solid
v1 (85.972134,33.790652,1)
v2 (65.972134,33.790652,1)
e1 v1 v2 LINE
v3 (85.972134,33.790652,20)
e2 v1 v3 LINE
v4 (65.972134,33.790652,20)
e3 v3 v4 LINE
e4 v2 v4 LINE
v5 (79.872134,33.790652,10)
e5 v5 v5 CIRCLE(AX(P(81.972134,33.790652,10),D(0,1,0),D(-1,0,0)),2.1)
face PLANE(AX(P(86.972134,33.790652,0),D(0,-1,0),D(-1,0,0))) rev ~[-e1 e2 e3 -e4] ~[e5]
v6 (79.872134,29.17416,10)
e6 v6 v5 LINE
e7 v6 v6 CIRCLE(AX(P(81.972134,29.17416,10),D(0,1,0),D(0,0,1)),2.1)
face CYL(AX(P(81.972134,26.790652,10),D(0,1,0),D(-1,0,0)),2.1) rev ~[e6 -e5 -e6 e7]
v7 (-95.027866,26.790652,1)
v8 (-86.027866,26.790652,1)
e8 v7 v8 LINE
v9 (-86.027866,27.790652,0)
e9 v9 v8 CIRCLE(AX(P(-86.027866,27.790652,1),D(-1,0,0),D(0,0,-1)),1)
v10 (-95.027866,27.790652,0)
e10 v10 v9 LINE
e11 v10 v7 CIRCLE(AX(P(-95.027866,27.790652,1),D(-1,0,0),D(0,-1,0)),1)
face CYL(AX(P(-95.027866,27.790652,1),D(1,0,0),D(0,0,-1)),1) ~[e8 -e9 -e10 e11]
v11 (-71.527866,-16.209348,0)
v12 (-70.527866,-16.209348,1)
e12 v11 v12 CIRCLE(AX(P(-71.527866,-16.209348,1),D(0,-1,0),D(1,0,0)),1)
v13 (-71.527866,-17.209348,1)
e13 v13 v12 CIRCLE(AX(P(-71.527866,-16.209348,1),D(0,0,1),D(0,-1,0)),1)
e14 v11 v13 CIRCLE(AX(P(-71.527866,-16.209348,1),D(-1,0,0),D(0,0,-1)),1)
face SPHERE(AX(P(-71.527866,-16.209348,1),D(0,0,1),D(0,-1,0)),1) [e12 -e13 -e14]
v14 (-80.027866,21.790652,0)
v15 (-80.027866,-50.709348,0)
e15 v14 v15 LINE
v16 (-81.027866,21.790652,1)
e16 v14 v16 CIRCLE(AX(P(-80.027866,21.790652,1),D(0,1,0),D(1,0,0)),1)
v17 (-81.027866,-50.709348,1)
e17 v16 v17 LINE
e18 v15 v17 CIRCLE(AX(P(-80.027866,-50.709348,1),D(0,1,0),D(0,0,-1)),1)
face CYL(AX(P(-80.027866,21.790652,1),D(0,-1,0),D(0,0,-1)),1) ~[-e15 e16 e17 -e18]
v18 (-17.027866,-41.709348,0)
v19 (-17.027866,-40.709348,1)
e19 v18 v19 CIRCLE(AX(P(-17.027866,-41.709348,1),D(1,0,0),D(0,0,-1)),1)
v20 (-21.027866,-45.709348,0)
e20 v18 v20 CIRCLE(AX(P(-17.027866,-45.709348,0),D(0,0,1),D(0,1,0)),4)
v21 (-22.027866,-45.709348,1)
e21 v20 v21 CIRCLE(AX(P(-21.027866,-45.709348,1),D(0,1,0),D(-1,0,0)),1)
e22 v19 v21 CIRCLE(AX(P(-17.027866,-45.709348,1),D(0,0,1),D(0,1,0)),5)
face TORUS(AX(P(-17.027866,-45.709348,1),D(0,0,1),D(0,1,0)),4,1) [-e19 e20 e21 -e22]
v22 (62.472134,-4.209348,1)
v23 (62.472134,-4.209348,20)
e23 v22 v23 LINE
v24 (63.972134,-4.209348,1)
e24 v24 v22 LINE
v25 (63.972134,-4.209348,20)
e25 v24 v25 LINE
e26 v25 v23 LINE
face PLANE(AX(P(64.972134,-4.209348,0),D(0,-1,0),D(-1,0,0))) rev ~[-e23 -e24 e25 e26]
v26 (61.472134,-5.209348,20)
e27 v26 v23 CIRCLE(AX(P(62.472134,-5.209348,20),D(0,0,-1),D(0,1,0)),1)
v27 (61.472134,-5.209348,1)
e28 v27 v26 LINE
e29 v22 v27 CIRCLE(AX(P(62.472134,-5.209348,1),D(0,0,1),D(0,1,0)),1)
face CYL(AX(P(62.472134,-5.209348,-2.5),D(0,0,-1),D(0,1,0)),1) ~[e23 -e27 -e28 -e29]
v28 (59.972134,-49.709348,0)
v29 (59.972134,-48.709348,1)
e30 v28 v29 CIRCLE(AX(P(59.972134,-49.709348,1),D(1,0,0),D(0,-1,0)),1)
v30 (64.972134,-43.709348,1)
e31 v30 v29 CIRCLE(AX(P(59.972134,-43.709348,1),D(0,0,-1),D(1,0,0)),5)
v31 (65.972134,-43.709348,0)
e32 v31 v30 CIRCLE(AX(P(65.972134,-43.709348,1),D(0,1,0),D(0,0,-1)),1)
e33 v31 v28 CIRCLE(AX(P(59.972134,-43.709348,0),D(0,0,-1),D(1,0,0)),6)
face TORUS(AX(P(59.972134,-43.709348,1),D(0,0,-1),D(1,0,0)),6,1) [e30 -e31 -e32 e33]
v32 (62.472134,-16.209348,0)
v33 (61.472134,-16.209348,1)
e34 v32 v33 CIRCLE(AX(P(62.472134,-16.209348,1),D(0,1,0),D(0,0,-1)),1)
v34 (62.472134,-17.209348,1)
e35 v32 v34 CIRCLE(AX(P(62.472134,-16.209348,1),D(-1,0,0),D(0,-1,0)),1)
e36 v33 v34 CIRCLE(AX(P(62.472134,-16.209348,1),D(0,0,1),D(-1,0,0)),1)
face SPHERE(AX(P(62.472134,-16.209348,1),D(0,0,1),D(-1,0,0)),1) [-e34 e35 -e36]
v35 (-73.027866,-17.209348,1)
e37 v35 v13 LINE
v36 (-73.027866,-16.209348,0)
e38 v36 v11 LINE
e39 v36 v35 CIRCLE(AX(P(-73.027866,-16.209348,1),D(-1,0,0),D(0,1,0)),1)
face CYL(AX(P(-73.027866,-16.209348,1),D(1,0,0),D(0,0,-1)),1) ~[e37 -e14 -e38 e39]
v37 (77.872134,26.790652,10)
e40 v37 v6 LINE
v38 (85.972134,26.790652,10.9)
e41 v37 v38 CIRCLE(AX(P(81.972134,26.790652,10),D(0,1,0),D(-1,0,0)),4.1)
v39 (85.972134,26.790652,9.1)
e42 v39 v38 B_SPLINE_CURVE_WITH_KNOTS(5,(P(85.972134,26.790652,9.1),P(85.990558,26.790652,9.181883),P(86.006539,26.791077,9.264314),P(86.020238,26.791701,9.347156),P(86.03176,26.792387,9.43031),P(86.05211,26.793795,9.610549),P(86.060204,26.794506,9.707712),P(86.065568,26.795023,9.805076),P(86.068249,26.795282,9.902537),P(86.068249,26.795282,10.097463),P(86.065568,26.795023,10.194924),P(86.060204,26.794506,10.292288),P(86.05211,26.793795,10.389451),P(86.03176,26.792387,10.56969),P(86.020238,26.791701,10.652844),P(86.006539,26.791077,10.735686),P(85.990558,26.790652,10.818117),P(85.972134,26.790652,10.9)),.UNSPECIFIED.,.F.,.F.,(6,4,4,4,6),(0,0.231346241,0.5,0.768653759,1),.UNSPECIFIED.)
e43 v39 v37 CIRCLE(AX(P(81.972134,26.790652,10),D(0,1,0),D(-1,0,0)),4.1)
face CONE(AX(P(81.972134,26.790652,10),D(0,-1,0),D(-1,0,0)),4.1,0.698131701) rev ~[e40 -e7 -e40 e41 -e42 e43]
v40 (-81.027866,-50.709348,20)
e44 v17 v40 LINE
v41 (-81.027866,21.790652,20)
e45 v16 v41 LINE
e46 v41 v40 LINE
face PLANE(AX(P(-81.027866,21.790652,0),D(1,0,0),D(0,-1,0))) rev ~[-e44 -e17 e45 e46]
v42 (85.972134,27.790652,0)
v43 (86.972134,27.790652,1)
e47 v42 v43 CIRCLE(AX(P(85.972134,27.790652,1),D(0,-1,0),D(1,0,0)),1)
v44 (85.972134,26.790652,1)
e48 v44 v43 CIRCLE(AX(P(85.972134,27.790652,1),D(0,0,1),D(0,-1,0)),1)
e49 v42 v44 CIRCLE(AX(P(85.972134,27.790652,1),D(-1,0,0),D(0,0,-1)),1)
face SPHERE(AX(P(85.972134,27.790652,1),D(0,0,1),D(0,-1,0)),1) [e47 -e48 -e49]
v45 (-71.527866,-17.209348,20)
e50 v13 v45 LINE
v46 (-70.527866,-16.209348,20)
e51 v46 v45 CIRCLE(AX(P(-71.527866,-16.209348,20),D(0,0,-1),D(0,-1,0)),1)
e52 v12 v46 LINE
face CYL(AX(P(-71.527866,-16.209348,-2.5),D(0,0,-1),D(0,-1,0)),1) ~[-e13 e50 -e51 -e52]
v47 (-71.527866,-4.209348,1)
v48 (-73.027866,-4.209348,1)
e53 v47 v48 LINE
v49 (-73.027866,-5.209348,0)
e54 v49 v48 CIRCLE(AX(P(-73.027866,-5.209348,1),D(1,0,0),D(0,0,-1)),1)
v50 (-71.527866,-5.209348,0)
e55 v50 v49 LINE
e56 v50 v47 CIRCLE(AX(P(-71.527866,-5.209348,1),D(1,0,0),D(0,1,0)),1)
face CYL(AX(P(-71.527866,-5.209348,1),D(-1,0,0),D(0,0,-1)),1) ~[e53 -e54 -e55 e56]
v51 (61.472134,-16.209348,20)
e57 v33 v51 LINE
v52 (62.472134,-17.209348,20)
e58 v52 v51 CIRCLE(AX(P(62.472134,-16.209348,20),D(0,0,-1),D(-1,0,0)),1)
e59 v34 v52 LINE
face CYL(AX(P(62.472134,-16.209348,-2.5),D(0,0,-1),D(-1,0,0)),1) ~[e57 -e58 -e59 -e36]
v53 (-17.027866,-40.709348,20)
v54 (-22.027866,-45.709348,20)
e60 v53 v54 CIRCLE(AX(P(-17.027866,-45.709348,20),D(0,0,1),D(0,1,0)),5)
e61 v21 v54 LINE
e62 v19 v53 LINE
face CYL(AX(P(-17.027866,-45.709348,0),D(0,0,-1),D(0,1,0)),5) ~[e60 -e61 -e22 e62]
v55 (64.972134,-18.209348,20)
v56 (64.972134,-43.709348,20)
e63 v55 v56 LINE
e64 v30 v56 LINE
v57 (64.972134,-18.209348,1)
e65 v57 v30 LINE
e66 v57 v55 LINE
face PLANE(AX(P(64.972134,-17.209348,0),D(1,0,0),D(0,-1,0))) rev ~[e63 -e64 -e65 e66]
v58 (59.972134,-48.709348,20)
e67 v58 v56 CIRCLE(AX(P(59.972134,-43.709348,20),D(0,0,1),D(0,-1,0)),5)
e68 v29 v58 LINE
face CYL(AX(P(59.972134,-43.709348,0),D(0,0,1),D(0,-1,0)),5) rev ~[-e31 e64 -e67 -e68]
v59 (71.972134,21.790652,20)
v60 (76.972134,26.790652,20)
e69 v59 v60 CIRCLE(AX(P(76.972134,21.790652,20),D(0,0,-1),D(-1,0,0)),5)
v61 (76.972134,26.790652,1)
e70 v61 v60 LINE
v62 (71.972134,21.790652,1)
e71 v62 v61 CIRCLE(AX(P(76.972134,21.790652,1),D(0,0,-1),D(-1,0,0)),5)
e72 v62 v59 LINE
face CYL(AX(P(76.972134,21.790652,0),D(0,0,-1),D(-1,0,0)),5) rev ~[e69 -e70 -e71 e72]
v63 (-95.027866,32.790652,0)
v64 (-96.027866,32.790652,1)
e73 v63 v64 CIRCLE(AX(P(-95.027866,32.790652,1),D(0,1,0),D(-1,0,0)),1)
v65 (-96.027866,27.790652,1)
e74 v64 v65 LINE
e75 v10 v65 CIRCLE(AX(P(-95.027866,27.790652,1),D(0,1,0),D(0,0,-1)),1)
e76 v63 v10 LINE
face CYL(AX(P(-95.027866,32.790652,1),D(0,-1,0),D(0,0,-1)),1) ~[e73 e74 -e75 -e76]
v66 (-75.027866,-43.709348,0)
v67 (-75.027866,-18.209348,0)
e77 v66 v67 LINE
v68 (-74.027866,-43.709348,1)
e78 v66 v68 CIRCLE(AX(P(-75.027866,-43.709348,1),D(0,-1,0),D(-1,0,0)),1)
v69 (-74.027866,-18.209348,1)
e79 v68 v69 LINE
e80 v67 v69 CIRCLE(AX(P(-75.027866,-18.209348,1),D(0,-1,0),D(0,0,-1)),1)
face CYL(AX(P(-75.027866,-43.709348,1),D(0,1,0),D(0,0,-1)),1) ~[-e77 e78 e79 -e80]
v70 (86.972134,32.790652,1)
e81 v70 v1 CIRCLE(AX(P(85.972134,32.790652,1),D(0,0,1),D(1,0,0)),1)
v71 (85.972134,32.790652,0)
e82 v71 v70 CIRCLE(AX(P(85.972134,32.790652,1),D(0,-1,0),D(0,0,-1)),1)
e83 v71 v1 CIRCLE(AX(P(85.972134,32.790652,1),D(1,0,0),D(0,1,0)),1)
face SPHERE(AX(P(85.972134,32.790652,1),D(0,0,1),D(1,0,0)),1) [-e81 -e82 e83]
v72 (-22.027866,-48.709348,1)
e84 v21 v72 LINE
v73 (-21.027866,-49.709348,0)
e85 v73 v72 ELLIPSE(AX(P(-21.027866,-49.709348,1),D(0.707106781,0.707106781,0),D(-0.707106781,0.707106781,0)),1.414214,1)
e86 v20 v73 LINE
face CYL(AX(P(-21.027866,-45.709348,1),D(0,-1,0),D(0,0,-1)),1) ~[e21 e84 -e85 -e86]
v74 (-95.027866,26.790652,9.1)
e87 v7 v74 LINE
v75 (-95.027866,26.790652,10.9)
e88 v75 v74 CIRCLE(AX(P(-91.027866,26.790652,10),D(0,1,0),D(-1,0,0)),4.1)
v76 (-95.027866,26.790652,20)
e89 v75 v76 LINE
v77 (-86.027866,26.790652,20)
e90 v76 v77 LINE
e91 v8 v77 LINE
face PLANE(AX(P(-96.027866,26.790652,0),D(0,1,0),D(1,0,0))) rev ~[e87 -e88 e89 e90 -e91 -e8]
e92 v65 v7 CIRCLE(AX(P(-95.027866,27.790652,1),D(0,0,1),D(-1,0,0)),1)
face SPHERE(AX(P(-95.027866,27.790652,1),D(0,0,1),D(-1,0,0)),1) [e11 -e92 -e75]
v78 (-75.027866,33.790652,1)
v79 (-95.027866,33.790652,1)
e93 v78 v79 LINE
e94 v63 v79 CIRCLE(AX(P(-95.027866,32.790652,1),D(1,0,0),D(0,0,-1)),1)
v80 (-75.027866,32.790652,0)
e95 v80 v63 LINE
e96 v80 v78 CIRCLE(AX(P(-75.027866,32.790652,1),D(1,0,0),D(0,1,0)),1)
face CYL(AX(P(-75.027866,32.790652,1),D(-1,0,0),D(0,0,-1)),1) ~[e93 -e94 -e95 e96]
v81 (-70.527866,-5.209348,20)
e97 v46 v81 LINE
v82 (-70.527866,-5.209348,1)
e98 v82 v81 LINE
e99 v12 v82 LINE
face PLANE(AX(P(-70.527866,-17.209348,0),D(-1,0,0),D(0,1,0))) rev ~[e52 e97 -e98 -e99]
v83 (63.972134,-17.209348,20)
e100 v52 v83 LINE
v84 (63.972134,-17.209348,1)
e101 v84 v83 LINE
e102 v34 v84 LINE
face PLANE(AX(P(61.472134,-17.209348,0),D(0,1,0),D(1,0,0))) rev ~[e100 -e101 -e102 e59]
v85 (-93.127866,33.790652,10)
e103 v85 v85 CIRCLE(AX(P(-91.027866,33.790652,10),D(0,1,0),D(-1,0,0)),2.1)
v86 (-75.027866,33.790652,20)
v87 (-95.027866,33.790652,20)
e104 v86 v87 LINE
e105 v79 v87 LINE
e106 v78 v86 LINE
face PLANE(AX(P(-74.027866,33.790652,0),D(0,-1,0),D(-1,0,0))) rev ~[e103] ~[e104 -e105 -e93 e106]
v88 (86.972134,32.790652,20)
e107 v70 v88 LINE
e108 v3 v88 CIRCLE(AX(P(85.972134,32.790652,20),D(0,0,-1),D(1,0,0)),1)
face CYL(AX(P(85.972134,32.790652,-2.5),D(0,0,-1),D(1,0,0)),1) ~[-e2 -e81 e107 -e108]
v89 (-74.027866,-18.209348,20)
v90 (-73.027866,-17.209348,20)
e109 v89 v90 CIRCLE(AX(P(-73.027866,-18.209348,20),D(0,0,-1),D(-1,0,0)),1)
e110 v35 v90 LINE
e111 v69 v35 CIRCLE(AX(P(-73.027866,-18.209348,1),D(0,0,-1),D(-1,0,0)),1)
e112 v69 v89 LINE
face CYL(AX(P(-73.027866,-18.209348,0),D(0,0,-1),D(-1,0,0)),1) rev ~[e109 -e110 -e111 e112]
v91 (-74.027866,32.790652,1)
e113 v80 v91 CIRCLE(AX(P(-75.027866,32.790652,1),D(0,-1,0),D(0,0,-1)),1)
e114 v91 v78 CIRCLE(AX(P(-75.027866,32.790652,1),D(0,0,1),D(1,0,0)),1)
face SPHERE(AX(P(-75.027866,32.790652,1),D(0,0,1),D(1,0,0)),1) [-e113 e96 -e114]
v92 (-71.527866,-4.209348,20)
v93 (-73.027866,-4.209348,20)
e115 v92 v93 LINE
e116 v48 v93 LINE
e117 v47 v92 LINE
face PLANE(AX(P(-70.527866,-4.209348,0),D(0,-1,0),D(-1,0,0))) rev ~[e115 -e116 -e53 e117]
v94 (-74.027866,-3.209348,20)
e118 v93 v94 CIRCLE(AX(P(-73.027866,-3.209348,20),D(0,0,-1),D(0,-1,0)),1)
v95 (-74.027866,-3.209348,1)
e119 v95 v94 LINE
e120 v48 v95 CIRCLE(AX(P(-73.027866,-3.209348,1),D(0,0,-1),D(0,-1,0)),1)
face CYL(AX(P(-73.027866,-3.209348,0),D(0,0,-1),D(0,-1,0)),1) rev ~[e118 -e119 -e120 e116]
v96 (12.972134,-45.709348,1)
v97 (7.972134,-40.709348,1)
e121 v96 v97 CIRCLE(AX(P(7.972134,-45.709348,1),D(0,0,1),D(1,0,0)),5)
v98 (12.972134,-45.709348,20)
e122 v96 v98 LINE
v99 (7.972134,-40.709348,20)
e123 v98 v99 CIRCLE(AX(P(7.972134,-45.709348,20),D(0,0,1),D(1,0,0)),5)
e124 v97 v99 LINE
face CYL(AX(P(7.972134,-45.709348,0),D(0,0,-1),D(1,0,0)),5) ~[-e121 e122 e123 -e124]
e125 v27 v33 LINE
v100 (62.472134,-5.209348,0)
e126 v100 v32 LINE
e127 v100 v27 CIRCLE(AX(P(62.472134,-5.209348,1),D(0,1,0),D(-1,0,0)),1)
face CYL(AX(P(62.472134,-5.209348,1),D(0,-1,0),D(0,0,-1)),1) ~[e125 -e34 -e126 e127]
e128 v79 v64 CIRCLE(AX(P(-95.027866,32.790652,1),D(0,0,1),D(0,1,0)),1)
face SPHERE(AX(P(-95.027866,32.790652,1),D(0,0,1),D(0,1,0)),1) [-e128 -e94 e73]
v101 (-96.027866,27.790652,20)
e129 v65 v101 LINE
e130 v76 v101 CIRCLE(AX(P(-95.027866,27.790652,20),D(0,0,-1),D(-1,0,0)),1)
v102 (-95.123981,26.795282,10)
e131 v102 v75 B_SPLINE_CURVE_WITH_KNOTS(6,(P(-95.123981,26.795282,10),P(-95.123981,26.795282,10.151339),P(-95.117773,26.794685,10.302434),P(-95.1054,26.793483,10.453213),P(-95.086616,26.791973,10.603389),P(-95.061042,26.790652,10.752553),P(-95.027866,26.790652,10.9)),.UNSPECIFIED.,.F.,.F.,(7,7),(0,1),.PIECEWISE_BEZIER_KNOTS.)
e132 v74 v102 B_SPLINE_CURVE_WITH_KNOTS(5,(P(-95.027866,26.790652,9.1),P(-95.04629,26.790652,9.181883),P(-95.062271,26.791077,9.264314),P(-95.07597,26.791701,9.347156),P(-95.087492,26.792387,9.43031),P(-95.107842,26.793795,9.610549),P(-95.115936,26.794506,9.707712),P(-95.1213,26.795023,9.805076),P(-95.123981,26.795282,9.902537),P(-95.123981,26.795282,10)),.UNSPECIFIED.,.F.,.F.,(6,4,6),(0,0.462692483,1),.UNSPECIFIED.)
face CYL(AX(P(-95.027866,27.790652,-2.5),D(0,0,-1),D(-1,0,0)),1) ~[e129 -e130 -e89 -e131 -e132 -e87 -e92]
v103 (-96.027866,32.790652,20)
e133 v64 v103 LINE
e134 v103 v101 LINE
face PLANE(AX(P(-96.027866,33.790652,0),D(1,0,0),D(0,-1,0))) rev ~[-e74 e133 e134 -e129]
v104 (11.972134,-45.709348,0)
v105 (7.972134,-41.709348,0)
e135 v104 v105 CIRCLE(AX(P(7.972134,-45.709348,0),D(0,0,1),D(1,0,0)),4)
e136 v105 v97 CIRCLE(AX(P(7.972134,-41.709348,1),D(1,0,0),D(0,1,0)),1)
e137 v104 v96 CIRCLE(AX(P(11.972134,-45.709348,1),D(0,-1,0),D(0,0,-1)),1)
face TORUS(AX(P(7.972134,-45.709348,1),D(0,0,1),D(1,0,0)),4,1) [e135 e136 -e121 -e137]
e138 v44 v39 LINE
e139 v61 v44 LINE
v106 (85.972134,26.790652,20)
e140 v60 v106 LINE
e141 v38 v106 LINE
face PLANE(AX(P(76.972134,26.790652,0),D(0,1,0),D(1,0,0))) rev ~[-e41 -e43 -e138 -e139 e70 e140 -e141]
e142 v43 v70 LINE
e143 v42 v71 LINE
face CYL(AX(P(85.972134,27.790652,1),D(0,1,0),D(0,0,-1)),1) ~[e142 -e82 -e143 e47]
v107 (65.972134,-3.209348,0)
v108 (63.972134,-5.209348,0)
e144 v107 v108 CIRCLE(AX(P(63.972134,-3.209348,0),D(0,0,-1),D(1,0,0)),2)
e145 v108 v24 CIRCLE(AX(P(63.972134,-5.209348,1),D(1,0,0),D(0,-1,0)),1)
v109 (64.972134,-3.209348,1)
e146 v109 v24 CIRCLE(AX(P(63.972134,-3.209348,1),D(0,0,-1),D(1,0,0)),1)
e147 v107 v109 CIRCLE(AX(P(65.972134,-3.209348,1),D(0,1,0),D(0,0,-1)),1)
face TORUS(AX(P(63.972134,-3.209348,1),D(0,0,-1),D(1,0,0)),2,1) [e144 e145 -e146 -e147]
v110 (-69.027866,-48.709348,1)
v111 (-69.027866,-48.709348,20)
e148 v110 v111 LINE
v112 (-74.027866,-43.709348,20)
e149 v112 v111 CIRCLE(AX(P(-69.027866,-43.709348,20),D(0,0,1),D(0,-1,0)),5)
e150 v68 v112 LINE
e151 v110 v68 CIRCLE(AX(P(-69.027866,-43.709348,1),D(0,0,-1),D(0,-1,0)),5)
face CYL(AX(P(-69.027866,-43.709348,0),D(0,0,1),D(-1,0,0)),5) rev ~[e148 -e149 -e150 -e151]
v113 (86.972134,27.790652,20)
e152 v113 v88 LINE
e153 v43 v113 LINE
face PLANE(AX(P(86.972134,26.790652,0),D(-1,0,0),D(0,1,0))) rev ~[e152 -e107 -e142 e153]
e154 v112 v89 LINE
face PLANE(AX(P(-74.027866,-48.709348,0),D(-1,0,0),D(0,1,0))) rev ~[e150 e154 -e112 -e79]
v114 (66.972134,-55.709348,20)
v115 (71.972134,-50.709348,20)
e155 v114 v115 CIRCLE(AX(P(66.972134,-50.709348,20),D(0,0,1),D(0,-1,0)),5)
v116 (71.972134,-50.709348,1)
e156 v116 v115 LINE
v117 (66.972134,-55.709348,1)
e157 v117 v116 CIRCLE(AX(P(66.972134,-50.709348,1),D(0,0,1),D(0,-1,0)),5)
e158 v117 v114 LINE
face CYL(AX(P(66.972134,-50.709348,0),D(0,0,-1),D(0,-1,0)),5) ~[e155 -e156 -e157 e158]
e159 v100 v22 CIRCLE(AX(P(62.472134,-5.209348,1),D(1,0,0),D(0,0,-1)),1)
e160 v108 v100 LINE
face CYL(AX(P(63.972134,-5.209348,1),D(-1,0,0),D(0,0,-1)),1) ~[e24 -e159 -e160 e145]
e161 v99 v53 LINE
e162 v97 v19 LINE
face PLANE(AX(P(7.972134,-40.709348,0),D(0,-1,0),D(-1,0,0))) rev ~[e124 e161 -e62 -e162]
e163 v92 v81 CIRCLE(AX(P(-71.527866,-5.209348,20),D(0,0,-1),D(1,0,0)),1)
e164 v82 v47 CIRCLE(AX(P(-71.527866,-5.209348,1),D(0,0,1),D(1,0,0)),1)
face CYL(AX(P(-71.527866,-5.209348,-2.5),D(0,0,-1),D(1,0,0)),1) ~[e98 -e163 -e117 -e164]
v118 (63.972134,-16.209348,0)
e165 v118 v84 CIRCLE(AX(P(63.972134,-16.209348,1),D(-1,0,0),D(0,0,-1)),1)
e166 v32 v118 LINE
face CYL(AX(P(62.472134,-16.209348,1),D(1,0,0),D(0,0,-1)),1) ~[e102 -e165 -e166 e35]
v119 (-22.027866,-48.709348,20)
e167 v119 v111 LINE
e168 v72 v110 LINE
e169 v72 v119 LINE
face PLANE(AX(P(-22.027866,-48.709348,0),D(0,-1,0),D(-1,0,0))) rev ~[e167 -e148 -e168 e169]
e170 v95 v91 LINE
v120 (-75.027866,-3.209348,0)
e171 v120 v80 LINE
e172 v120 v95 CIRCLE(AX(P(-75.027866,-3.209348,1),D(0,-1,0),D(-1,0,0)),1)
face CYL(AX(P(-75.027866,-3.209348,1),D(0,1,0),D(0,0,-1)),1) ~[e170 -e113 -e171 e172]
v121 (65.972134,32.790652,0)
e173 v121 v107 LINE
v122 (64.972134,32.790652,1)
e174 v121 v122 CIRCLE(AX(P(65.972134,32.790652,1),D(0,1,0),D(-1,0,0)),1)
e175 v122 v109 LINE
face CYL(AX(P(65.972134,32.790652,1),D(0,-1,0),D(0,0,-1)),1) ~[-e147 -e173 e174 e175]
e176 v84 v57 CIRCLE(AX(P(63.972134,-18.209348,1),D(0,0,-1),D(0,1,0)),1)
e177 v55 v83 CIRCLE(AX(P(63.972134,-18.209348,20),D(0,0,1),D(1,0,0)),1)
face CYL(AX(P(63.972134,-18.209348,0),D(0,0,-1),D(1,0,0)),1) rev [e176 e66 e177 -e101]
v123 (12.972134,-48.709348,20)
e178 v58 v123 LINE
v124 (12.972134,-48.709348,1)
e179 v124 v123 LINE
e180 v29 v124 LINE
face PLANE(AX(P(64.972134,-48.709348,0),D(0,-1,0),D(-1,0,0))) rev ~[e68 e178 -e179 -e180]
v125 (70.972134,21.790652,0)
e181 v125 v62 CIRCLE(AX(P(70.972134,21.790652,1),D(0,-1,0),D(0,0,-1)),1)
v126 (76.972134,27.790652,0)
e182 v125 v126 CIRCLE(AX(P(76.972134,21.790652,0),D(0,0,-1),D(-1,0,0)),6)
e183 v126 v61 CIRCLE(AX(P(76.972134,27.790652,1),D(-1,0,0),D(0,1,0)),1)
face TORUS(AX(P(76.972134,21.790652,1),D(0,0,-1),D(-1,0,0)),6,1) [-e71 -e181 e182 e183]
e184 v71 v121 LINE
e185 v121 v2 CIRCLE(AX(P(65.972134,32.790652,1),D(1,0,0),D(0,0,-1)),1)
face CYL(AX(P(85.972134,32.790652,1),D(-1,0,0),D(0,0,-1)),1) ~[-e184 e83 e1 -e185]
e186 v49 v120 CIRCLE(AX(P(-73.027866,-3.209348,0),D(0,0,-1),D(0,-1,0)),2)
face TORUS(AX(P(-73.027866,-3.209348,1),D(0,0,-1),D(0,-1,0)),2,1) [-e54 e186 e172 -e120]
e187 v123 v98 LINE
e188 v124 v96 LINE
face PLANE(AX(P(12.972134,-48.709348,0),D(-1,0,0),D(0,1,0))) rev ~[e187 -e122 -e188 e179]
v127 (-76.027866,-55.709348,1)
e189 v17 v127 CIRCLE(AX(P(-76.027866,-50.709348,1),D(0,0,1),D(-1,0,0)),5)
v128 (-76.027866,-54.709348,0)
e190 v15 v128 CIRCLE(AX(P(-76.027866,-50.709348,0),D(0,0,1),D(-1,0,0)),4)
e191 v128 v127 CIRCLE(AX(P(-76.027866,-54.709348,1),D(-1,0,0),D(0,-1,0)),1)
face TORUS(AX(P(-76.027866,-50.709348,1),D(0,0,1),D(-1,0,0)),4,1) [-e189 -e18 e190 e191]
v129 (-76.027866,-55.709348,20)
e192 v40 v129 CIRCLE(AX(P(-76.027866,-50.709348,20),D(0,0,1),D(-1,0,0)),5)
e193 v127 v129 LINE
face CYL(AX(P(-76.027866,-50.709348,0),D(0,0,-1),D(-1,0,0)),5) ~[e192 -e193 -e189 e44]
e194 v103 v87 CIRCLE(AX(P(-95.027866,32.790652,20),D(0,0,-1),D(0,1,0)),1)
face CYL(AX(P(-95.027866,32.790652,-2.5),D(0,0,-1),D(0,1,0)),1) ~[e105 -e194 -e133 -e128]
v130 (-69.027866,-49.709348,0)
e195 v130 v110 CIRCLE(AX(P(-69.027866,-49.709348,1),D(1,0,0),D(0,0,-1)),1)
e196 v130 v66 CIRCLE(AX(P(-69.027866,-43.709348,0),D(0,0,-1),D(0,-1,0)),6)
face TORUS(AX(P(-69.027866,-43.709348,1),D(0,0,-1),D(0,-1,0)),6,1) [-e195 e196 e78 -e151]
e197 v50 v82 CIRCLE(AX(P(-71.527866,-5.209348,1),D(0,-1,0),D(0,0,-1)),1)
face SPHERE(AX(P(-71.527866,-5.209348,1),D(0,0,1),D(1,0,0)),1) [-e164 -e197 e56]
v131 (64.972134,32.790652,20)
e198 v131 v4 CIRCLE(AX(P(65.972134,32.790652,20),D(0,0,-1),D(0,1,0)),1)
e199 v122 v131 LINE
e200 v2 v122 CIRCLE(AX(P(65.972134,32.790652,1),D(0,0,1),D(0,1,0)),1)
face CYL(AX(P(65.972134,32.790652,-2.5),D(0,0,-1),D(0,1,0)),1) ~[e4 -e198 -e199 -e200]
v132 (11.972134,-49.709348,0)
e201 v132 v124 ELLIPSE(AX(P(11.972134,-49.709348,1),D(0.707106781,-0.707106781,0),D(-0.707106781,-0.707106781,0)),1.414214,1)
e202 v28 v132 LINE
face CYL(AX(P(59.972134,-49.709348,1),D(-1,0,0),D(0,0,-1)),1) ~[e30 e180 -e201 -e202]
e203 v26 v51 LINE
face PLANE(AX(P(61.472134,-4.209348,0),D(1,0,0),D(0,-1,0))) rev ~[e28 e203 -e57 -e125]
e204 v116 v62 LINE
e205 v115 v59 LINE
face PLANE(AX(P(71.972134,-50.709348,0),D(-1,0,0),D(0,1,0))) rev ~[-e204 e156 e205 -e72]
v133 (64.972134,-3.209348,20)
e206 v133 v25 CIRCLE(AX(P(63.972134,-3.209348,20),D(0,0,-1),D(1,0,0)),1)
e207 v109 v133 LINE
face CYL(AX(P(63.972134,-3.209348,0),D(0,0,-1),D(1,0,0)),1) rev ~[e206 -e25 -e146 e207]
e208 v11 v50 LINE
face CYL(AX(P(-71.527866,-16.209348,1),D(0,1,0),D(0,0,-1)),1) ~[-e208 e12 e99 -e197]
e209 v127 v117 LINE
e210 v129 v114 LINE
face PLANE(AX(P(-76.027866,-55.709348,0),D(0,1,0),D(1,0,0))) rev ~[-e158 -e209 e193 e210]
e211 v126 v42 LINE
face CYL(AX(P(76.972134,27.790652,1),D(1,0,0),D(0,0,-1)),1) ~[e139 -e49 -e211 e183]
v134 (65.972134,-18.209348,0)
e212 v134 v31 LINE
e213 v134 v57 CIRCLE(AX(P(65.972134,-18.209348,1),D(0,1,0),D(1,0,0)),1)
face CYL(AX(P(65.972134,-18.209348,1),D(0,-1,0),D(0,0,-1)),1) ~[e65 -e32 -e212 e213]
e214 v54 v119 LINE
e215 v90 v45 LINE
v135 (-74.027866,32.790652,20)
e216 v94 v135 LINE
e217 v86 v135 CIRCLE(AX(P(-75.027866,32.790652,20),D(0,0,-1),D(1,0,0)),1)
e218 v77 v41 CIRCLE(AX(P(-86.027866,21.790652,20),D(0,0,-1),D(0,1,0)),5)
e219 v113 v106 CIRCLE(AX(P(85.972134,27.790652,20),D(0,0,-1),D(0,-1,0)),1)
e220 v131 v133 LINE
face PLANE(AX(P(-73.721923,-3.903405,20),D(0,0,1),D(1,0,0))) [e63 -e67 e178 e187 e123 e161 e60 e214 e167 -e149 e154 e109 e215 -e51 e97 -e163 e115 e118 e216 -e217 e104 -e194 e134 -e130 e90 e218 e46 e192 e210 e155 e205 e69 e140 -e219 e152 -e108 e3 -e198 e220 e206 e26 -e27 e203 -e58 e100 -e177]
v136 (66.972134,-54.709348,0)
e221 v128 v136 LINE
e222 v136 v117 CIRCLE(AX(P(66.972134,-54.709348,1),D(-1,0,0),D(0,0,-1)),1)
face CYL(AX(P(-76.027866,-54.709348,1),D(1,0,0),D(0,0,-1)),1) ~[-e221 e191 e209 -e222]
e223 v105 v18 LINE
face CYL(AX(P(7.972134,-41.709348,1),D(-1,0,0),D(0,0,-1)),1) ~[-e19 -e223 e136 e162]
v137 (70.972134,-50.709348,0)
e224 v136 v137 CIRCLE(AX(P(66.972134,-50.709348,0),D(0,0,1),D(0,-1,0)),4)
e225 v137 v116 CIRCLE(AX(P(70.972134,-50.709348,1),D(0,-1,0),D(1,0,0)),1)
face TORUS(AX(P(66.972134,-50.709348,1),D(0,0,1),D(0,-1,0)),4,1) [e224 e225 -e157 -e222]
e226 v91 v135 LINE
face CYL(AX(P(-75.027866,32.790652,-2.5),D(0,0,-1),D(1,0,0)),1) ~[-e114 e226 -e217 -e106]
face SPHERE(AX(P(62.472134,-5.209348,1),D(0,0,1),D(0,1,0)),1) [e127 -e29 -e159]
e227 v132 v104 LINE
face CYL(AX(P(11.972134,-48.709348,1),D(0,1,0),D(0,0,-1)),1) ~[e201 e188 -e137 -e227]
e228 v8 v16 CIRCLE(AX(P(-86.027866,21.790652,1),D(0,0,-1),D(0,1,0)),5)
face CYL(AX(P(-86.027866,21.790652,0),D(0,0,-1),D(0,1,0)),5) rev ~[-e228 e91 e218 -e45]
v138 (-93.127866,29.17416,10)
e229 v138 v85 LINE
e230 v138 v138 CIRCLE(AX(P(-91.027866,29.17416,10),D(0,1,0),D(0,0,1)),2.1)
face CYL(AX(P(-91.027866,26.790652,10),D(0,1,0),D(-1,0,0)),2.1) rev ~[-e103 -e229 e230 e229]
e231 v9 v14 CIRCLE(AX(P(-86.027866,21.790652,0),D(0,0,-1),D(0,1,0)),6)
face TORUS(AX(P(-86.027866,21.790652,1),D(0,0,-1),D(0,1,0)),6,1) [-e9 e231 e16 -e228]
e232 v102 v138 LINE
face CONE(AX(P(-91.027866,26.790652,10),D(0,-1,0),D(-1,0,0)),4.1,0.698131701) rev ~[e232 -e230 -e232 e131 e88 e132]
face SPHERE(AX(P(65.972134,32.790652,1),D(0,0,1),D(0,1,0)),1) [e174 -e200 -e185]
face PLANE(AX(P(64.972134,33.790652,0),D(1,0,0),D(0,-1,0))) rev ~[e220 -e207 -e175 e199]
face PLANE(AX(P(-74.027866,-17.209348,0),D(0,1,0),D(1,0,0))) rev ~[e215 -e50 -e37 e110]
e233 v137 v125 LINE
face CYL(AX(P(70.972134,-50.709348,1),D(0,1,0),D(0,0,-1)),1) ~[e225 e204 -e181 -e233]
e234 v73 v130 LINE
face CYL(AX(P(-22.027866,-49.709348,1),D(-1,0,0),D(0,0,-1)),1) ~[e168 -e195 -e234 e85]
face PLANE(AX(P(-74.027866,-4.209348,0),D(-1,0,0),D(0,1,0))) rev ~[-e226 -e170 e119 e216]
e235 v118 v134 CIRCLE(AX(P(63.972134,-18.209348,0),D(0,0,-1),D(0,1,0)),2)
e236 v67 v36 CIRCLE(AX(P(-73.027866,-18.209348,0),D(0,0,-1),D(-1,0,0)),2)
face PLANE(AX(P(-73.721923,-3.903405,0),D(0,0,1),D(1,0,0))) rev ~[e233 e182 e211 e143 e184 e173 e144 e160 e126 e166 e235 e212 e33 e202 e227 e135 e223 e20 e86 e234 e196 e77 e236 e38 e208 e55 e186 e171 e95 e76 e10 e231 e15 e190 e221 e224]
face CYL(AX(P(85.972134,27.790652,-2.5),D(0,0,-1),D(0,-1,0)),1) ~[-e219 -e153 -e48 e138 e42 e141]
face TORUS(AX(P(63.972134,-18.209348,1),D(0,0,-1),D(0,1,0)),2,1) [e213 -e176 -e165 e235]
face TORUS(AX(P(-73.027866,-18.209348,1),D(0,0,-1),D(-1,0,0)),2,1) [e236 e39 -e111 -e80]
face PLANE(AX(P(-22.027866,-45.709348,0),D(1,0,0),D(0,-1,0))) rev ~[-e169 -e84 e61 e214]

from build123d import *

# Parameters (mm, degrees)
F1_DEPTH             = 20
F4_D                 = 4.2
F4_CSINK_D           = 8.2
F4_CSINK_ANGLE       = 80
F4_ON_F2_D           = 4.2
F4_ON_F2_CSINK_D     = 8.2
F4_ON_F2_CSINK_ANGLE = 80
F5_T1_DEPTH          = 20
F5_T3_DEPTH          = 25
F6_R                 = 5
F7_R                 = 1


# Not quite as in the source:
# - a fillet or chamfer that OpenCascade refuses, or shapes differently, is made with other operations: its cross-section is extruded or revolved along the edge and cut away or added


with BuildPart() as f1:
    # F0 (on Top) → F1 (new body)
    with BuildSketch(Plane.XY):
        with BuildLine():
            Line((-74.0278660059, -17.2093475759), (-70.5278660059, -17.2093475759))
            Line((-70.5278660059, -17.2093475759), (-70.5278660059, -4.2093475759))
            Line((-70.5278660059, -4.2093475759), (-74.0278660059, -4.2093475759))
            Line((-74.0278660059, -4.2093475759), (-74.0278660059, 33.7906524241))
            Line((-74.0278660059, 33.7906524241), (-81.0278660059, 33.7906524241))
            Line((-81.0278660059, 33.7906524241), (-96.0278660059, 33.7906524241))
            Line((-96.0278660059, 33.7906524241), (-96.0278660059, 26.7906524241))
            Line((-96.0278660059, 26.7906524241), (-86.0278660059, 26.7906524241))
            ThreePointArc((-86.0278660059, 26.7906524241), (-82.4923321, 25.32618633), (-81.0278660059, 21.7906524241))
            Line((-81.0278660059, 21.7906524241), (-81.0278660059, -48.7093475759))
            Line((-81.0278660059, -48.7093475759), (-81.0278660059, -50.7093475759))
            ThreePointArc((-81.0278660059, -50.7093475759), (-79.5633999118, -54.2448814818), (-76.0278660059, -55.7093475759))
            Line((-76.0278660059, -55.7093475759), (-48.0278660059, -55.7093475759))
            Line((-48.0278660059, -55.7093475759), (-4.5278660059, -55.7093475759))
            Line((-4.5278660059, -55.7093475759), (38.9721339941, -55.7093475759))
            Line((38.9721339941, -55.7093475759), (66.9721339941, -55.7093475759))
            ThreePointArc((66.9721339941, -55.7093475759), (70.5076679, -54.2448814818), (71.9721339941, -50.7093475759))
            Line((71.9721339941, -50.7093475759), (71.9721339941, -48.7093475759))
            Line((71.9721339941, -48.7093475759), (71.9721339941, 21.7906524241))
            ThreePointArc((71.9721339941, 21.7906524241), (73.4366000882, 25.32618633), (76.9721339941, 26.7906524241))
            Line((76.9721339941, 26.7906524241), (86.9721339941, 26.7906524241))
            Line((86.9721339941, 26.7906524241), (86.9721339941, 33.7906524241))
            Line((86.9721339941, 33.7906524241), (71.9721339941, 33.7906524241))
            Line((71.9721339941, 33.7906524241), (64.9721339941, 33.7906524241))
            Line((64.9721339941, 33.7906524241), (64.9721339941, -4.2093475759))
            Line((64.9721339941, -4.2093475759), (61.4721339941, -4.2093475759))
            Line((61.4721339941, -4.2093475759), (61.4721339941, -17.2093475759))
            Line((61.4721339941, -17.2093475759), (64.9721339941, -17.2093475759))
            Line((64.9721339941, -17.2093475759), (64.9721339941, -48.7093475759))
            Line((64.9721339941, -48.7093475759), (12.9721339941, -48.7093475759))
            Line((12.9721339941, -48.7093475759), (12.9721339941, -45.7093475759))
            ThreePointArc((12.9721339941, -45.7093475759), (11.5076679, -42.17381367), (7.9721339941, -40.7093475759))
            Line((7.9721339941, -40.7093475759), (-4.5278660059, -40.7093475759))
            Line((-4.5278660059, -40.7093475759), (-17.0278660059, -40.7093475759))
            ThreePointArc((-17.0278660059, -40.7093475759), (-20.5633999118, -42.17381367), (-22.0278660059, -45.7093475759))
            Line((-22.0278660059, -45.7093475759), (-22.0278660059, -48.7093475759))
            Line((-22.0278660059, -48.7093475759), (-74.0278660059, -48.7093475759))
            Line((-74.0278660059, -48.7093475759), (-74.0278660059, -17.2093475759))
        make_face()
    extrude(amount=F1_DEPTH)

    # F4 (through all)
    with Locations(Plane.XZ.offset(-26.7906524241)):
        with Locations((81.9721339941, 10)):
            CounterSinkHole(F4_D / 2, F4_CSINK_D / 2, counter_sink_angle=F4_CSINK_ANGLE)

    # F4 on F2 (through all)
    with Locations(Plane.XZ.offset(-26.7906524241)):
        with Locations((-91.0278660059, 10)):
            CounterSinkHole(F4_ON_F2_D / 2, F4_ON_F2_CSINK_D / 2, counter_sink_angle=F4_ON_F2_CSINK_ANGLE)

    # F5: fillet of radius 1 on 14 edges, made by hand

    # F5_s2 → F5_t1 (join)
    with BuildSketch(Plane.XY):
        with BuildLine():
            ThreePointArc((-73.0278660059, -4.2093475759), (-73.7349727871, -3.9164543571), (-74.0278660059, -3.2093475759))
            Line((-74.0278660059, -3.2093475759), (-74.0278660059, -4.2093475759))
            Line((-74.0278660059, -4.2093475759), (-73.0278660059, -4.2093475759))
        make_face()
        with BuildLine():
            ThreePointArc((-74.0278660059, -18.2093475759), (-73.7349727871, -17.5022407947), (-73.0278660059, -17.2093475759))
            Line((-73.0278660059, -17.2093475759), (-74.0278660059, -17.2093475759))
            Line((-74.0278660059, -17.2093475759), (-74.0278660059, -18.2093475759))
        make_face()
        with BuildLine():
            ThreePointArc((64.9721339941, -18.2093475759), (64.6792407753, -17.5022407947), (63.9721339941, -17.2093475759))
            Line((63.9721339941, -17.2093475759), (64.9721339941, -17.2093475759))
            Line((64.9721339941, -17.2093475759), (64.9721339941, -18.2093475759))
        make_face()
        with BuildLine():
            ThreePointArc((64.9721339941, -3.2093475759), (64.6792407753, -3.9164543571), (63.9721339941, -4.2093475759))
            Line((63.9721339941, -4.2093475759), (64.9721339941, -4.2093475759))
            Line((64.9721339941, -4.2093475759), (64.9721339941, -3.2093475759))
        make_face()
    extrude(amount=F5_T1_DEPTH)

    # F5_s4 → F5_t3 (cut)
    with BuildSketch(Plane.XY.offset(-2.5)):
        with BuildLine():
            ThreePointArc((65.9721339941, 33.7906524241), (65.2650272129, 33.4977592053), (64.9721339941, 32.7906524241))
            Line((64.9721339941, 32.7906524241), (64.9721339941, 33.7906524241))
            Line((64.9721339941, 33.7906524241), (65.9721339941, 33.7906524241))
        make_face()
        with BuildLine():
            ThreePointArc((62.4721339941, -4.2093475759), (61.7650272129, -4.5022407947), (61.4721339941, -5.2093475759))
            Line((61.4721339941, -5.2093475759), (61.4721339941, -4.2093475759))
            Line((61.4721339941, -4.2093475759), (62.4721339941, -4.2093475759))
        make_face()
        with BuildLine():
            ThreePointArc((61.4721339941, -16.2093475759), (61.7650272129, -16.9164543571), (62.4721339941, -17.2093475759))
            Line((62.4721339941, -17.2093475759), (61.4721339941, -17.2093475759))
            Line((61.4721339941, -17.2093475759), (61.4721339941, -16.2093475759))
        make_face()
        with BuildLine():
            ThreePointArc((-71.5278660059, -17.2093475759), (-70.8207592247, -16.9164543571), (-70.5278660059, -16.2093475759))
            Line((-70.5278660059, -16.2093475759), (-70.5278660059, -17.2093475759))
            Line((-70.5278660059, -17.2093475759), (-71.5278660059, -17.2093475759))
        make_face()
        with BuildLine():
            ThreePointArc((-74.0278660059, 32.7906524241), (-74.3207592247, 33.4977592053), (-75.0278660059, 33.7906524241))
            Line((-75.0278660059, 33.7906524241), (-74.0278660059, 33.7906524241))
            Line((-74.0278660059, 33.7906524241), (-74.0278660059, 32.7906524241))
        make_face()
        with BuildLine():
            ThreePointArc((85.9721339941, 26.7906524241), (86.6792407753, 27.0835456429), (86.9721339941, 27.7906524241))
            Line((86.9721339941, 27.7906524241), (86.9721339941, 26.7906524241))
            Line((86.9721339941, 26.7906524241), (85.9721339941, 26.7906524241))
        make_face()
        with BuildLine():
            ThreePointArc((86.9721339941, 32.7906524241), (86.6792407753, 33.4977592053), (85.9721339941, 33.7906524241))
            Line((85.9721339941, 33.7906524241), (86.9721339941, 33.7906524241))
            Line((86.9721339941, 33.7906524241), (86.9721339941, 32.7906524241))
        make_face()
        with BuildLine():
            ThreePointArc((-70.5278660059, -5.2093475759), (-70.8207592247, -4.5022407947), (-71.5278660059, -4.2093475759))
            Line((-71.5278660059, -4.2093475759), (-70.5278660059, -4.2093475759))
            Line((-70.5278660059, -4.2093475759), (-70.5278660059, -5.2093475759))
        make_face()
        with BuildLine():
            ThreePointArc((-95.0278660059, 33.7906524241), (-95.7349727871, 33.4977592053), (-96.0278660059, 32.7906524241))
            Line((-96.0278660059, 32.7906524241), (-96.0278660059, 33.7906524241))
            Line((-96.0278660059, 33.7906524241), (-95.0278660059, 33.7906524241))
        make_face()
        with BuildLine():
            ThreePointArc((-96.0278660059, 27.7906524241), (-95.7349727871, 27.0835456429), (-95.0278660059, 26.7906524241))
            Line((-95.0278660059, 26.7906524241), (-96.0278660059, 26.7906524241))
            Line((-96.0278660059, 26.7906524241), (-96.0278660059, 27.7906524241))
        make_face()
    extrude(amount=F5_T3_DEPTH, mode=Mode.SUBTRACT)

    # F6
    f6_edges = [f1.edges().sort_by_distance(p)[0] for p in [
        (64.972134, -48.709348, 10),
        (-74.027866, -48.709348, 10),
    ]]
    fillet(f6_edges, radius=F6_R)

    # F7
    f7_edges = [f1.edges().sort_by_distance(p)[0] for p in [
        (-74.027866, -30.959348, 0),
        (-72.5634, -47.244881, 0),
        (-73.734973, -17.502241, 0),
        (-45.527866, -48.709348, 0),
        (-72.277866, -17.209348, 0),
        (-22.027866, -47.209348, 0),
        (-70.820759, -16.916454, 0),
        (-20.5634, -42.173814, 0),
        (-70.527866, -10.709348, 0),
        (-4.527866, -40.709348, 0),
        (-70.820759, -4.502241, 0),
        (11.507668, -42.173814, 0),
        (-72.277866, -4.209348, 0),
        (12.972134, -47.209348, 0),
        (-73.734973, -3.916454, 0),
        (36.472134, -48.709348, 0),
        (-74.027866, 14.790652, 0),
        (63.507668, -47.244881, 0),
        (-74.320759, 33.497759, 0),
        (64.972134, -30.959348, 0),
        (-85.027866, 33.790652, 0),
        (64.679241, -17.502241, 0),
        (-95.734973, 33.497759, 0),
        (63.222134, -17.209348, 0),
        (-96.027866, 30.290652, 0),
        (61.765027, -16.916454, 0),
        (-95.734973, 27.083546, 0),
        (61.472134, -10.709348, 0),
        (-90.527866, 26.790652, 0),
        (61.765027, -4.502241, 0),
        (-82.492332, 25.326186, 0),
        (63.222134, -4.209348, 0),
        (-81.027866, -14.459348, 0),
        (64.679241, -3.916454, 0),
        (-79.5634, -54.244881, 0),
        (64.972134, 14.790652, 0),
        (-4.527866, -55.709348, 0),
        (65.265027, 33.497759, 0),
        (70.507668, -54.244881, 0),
        (75.972134, 33.790652, 0),
        (71.972134, -14.459348, 0),
        (86.679241, 33.497759, 0),
        (73.4366, 25.326186, 0),
        (86.972134, 30.290652, 0),
        (81.472134, 26.790652, 0),
        (86.679241, 27.083546, 0),
    ]]
    fillet(f7_edges, radius=F7_R)


solid = f1.part
